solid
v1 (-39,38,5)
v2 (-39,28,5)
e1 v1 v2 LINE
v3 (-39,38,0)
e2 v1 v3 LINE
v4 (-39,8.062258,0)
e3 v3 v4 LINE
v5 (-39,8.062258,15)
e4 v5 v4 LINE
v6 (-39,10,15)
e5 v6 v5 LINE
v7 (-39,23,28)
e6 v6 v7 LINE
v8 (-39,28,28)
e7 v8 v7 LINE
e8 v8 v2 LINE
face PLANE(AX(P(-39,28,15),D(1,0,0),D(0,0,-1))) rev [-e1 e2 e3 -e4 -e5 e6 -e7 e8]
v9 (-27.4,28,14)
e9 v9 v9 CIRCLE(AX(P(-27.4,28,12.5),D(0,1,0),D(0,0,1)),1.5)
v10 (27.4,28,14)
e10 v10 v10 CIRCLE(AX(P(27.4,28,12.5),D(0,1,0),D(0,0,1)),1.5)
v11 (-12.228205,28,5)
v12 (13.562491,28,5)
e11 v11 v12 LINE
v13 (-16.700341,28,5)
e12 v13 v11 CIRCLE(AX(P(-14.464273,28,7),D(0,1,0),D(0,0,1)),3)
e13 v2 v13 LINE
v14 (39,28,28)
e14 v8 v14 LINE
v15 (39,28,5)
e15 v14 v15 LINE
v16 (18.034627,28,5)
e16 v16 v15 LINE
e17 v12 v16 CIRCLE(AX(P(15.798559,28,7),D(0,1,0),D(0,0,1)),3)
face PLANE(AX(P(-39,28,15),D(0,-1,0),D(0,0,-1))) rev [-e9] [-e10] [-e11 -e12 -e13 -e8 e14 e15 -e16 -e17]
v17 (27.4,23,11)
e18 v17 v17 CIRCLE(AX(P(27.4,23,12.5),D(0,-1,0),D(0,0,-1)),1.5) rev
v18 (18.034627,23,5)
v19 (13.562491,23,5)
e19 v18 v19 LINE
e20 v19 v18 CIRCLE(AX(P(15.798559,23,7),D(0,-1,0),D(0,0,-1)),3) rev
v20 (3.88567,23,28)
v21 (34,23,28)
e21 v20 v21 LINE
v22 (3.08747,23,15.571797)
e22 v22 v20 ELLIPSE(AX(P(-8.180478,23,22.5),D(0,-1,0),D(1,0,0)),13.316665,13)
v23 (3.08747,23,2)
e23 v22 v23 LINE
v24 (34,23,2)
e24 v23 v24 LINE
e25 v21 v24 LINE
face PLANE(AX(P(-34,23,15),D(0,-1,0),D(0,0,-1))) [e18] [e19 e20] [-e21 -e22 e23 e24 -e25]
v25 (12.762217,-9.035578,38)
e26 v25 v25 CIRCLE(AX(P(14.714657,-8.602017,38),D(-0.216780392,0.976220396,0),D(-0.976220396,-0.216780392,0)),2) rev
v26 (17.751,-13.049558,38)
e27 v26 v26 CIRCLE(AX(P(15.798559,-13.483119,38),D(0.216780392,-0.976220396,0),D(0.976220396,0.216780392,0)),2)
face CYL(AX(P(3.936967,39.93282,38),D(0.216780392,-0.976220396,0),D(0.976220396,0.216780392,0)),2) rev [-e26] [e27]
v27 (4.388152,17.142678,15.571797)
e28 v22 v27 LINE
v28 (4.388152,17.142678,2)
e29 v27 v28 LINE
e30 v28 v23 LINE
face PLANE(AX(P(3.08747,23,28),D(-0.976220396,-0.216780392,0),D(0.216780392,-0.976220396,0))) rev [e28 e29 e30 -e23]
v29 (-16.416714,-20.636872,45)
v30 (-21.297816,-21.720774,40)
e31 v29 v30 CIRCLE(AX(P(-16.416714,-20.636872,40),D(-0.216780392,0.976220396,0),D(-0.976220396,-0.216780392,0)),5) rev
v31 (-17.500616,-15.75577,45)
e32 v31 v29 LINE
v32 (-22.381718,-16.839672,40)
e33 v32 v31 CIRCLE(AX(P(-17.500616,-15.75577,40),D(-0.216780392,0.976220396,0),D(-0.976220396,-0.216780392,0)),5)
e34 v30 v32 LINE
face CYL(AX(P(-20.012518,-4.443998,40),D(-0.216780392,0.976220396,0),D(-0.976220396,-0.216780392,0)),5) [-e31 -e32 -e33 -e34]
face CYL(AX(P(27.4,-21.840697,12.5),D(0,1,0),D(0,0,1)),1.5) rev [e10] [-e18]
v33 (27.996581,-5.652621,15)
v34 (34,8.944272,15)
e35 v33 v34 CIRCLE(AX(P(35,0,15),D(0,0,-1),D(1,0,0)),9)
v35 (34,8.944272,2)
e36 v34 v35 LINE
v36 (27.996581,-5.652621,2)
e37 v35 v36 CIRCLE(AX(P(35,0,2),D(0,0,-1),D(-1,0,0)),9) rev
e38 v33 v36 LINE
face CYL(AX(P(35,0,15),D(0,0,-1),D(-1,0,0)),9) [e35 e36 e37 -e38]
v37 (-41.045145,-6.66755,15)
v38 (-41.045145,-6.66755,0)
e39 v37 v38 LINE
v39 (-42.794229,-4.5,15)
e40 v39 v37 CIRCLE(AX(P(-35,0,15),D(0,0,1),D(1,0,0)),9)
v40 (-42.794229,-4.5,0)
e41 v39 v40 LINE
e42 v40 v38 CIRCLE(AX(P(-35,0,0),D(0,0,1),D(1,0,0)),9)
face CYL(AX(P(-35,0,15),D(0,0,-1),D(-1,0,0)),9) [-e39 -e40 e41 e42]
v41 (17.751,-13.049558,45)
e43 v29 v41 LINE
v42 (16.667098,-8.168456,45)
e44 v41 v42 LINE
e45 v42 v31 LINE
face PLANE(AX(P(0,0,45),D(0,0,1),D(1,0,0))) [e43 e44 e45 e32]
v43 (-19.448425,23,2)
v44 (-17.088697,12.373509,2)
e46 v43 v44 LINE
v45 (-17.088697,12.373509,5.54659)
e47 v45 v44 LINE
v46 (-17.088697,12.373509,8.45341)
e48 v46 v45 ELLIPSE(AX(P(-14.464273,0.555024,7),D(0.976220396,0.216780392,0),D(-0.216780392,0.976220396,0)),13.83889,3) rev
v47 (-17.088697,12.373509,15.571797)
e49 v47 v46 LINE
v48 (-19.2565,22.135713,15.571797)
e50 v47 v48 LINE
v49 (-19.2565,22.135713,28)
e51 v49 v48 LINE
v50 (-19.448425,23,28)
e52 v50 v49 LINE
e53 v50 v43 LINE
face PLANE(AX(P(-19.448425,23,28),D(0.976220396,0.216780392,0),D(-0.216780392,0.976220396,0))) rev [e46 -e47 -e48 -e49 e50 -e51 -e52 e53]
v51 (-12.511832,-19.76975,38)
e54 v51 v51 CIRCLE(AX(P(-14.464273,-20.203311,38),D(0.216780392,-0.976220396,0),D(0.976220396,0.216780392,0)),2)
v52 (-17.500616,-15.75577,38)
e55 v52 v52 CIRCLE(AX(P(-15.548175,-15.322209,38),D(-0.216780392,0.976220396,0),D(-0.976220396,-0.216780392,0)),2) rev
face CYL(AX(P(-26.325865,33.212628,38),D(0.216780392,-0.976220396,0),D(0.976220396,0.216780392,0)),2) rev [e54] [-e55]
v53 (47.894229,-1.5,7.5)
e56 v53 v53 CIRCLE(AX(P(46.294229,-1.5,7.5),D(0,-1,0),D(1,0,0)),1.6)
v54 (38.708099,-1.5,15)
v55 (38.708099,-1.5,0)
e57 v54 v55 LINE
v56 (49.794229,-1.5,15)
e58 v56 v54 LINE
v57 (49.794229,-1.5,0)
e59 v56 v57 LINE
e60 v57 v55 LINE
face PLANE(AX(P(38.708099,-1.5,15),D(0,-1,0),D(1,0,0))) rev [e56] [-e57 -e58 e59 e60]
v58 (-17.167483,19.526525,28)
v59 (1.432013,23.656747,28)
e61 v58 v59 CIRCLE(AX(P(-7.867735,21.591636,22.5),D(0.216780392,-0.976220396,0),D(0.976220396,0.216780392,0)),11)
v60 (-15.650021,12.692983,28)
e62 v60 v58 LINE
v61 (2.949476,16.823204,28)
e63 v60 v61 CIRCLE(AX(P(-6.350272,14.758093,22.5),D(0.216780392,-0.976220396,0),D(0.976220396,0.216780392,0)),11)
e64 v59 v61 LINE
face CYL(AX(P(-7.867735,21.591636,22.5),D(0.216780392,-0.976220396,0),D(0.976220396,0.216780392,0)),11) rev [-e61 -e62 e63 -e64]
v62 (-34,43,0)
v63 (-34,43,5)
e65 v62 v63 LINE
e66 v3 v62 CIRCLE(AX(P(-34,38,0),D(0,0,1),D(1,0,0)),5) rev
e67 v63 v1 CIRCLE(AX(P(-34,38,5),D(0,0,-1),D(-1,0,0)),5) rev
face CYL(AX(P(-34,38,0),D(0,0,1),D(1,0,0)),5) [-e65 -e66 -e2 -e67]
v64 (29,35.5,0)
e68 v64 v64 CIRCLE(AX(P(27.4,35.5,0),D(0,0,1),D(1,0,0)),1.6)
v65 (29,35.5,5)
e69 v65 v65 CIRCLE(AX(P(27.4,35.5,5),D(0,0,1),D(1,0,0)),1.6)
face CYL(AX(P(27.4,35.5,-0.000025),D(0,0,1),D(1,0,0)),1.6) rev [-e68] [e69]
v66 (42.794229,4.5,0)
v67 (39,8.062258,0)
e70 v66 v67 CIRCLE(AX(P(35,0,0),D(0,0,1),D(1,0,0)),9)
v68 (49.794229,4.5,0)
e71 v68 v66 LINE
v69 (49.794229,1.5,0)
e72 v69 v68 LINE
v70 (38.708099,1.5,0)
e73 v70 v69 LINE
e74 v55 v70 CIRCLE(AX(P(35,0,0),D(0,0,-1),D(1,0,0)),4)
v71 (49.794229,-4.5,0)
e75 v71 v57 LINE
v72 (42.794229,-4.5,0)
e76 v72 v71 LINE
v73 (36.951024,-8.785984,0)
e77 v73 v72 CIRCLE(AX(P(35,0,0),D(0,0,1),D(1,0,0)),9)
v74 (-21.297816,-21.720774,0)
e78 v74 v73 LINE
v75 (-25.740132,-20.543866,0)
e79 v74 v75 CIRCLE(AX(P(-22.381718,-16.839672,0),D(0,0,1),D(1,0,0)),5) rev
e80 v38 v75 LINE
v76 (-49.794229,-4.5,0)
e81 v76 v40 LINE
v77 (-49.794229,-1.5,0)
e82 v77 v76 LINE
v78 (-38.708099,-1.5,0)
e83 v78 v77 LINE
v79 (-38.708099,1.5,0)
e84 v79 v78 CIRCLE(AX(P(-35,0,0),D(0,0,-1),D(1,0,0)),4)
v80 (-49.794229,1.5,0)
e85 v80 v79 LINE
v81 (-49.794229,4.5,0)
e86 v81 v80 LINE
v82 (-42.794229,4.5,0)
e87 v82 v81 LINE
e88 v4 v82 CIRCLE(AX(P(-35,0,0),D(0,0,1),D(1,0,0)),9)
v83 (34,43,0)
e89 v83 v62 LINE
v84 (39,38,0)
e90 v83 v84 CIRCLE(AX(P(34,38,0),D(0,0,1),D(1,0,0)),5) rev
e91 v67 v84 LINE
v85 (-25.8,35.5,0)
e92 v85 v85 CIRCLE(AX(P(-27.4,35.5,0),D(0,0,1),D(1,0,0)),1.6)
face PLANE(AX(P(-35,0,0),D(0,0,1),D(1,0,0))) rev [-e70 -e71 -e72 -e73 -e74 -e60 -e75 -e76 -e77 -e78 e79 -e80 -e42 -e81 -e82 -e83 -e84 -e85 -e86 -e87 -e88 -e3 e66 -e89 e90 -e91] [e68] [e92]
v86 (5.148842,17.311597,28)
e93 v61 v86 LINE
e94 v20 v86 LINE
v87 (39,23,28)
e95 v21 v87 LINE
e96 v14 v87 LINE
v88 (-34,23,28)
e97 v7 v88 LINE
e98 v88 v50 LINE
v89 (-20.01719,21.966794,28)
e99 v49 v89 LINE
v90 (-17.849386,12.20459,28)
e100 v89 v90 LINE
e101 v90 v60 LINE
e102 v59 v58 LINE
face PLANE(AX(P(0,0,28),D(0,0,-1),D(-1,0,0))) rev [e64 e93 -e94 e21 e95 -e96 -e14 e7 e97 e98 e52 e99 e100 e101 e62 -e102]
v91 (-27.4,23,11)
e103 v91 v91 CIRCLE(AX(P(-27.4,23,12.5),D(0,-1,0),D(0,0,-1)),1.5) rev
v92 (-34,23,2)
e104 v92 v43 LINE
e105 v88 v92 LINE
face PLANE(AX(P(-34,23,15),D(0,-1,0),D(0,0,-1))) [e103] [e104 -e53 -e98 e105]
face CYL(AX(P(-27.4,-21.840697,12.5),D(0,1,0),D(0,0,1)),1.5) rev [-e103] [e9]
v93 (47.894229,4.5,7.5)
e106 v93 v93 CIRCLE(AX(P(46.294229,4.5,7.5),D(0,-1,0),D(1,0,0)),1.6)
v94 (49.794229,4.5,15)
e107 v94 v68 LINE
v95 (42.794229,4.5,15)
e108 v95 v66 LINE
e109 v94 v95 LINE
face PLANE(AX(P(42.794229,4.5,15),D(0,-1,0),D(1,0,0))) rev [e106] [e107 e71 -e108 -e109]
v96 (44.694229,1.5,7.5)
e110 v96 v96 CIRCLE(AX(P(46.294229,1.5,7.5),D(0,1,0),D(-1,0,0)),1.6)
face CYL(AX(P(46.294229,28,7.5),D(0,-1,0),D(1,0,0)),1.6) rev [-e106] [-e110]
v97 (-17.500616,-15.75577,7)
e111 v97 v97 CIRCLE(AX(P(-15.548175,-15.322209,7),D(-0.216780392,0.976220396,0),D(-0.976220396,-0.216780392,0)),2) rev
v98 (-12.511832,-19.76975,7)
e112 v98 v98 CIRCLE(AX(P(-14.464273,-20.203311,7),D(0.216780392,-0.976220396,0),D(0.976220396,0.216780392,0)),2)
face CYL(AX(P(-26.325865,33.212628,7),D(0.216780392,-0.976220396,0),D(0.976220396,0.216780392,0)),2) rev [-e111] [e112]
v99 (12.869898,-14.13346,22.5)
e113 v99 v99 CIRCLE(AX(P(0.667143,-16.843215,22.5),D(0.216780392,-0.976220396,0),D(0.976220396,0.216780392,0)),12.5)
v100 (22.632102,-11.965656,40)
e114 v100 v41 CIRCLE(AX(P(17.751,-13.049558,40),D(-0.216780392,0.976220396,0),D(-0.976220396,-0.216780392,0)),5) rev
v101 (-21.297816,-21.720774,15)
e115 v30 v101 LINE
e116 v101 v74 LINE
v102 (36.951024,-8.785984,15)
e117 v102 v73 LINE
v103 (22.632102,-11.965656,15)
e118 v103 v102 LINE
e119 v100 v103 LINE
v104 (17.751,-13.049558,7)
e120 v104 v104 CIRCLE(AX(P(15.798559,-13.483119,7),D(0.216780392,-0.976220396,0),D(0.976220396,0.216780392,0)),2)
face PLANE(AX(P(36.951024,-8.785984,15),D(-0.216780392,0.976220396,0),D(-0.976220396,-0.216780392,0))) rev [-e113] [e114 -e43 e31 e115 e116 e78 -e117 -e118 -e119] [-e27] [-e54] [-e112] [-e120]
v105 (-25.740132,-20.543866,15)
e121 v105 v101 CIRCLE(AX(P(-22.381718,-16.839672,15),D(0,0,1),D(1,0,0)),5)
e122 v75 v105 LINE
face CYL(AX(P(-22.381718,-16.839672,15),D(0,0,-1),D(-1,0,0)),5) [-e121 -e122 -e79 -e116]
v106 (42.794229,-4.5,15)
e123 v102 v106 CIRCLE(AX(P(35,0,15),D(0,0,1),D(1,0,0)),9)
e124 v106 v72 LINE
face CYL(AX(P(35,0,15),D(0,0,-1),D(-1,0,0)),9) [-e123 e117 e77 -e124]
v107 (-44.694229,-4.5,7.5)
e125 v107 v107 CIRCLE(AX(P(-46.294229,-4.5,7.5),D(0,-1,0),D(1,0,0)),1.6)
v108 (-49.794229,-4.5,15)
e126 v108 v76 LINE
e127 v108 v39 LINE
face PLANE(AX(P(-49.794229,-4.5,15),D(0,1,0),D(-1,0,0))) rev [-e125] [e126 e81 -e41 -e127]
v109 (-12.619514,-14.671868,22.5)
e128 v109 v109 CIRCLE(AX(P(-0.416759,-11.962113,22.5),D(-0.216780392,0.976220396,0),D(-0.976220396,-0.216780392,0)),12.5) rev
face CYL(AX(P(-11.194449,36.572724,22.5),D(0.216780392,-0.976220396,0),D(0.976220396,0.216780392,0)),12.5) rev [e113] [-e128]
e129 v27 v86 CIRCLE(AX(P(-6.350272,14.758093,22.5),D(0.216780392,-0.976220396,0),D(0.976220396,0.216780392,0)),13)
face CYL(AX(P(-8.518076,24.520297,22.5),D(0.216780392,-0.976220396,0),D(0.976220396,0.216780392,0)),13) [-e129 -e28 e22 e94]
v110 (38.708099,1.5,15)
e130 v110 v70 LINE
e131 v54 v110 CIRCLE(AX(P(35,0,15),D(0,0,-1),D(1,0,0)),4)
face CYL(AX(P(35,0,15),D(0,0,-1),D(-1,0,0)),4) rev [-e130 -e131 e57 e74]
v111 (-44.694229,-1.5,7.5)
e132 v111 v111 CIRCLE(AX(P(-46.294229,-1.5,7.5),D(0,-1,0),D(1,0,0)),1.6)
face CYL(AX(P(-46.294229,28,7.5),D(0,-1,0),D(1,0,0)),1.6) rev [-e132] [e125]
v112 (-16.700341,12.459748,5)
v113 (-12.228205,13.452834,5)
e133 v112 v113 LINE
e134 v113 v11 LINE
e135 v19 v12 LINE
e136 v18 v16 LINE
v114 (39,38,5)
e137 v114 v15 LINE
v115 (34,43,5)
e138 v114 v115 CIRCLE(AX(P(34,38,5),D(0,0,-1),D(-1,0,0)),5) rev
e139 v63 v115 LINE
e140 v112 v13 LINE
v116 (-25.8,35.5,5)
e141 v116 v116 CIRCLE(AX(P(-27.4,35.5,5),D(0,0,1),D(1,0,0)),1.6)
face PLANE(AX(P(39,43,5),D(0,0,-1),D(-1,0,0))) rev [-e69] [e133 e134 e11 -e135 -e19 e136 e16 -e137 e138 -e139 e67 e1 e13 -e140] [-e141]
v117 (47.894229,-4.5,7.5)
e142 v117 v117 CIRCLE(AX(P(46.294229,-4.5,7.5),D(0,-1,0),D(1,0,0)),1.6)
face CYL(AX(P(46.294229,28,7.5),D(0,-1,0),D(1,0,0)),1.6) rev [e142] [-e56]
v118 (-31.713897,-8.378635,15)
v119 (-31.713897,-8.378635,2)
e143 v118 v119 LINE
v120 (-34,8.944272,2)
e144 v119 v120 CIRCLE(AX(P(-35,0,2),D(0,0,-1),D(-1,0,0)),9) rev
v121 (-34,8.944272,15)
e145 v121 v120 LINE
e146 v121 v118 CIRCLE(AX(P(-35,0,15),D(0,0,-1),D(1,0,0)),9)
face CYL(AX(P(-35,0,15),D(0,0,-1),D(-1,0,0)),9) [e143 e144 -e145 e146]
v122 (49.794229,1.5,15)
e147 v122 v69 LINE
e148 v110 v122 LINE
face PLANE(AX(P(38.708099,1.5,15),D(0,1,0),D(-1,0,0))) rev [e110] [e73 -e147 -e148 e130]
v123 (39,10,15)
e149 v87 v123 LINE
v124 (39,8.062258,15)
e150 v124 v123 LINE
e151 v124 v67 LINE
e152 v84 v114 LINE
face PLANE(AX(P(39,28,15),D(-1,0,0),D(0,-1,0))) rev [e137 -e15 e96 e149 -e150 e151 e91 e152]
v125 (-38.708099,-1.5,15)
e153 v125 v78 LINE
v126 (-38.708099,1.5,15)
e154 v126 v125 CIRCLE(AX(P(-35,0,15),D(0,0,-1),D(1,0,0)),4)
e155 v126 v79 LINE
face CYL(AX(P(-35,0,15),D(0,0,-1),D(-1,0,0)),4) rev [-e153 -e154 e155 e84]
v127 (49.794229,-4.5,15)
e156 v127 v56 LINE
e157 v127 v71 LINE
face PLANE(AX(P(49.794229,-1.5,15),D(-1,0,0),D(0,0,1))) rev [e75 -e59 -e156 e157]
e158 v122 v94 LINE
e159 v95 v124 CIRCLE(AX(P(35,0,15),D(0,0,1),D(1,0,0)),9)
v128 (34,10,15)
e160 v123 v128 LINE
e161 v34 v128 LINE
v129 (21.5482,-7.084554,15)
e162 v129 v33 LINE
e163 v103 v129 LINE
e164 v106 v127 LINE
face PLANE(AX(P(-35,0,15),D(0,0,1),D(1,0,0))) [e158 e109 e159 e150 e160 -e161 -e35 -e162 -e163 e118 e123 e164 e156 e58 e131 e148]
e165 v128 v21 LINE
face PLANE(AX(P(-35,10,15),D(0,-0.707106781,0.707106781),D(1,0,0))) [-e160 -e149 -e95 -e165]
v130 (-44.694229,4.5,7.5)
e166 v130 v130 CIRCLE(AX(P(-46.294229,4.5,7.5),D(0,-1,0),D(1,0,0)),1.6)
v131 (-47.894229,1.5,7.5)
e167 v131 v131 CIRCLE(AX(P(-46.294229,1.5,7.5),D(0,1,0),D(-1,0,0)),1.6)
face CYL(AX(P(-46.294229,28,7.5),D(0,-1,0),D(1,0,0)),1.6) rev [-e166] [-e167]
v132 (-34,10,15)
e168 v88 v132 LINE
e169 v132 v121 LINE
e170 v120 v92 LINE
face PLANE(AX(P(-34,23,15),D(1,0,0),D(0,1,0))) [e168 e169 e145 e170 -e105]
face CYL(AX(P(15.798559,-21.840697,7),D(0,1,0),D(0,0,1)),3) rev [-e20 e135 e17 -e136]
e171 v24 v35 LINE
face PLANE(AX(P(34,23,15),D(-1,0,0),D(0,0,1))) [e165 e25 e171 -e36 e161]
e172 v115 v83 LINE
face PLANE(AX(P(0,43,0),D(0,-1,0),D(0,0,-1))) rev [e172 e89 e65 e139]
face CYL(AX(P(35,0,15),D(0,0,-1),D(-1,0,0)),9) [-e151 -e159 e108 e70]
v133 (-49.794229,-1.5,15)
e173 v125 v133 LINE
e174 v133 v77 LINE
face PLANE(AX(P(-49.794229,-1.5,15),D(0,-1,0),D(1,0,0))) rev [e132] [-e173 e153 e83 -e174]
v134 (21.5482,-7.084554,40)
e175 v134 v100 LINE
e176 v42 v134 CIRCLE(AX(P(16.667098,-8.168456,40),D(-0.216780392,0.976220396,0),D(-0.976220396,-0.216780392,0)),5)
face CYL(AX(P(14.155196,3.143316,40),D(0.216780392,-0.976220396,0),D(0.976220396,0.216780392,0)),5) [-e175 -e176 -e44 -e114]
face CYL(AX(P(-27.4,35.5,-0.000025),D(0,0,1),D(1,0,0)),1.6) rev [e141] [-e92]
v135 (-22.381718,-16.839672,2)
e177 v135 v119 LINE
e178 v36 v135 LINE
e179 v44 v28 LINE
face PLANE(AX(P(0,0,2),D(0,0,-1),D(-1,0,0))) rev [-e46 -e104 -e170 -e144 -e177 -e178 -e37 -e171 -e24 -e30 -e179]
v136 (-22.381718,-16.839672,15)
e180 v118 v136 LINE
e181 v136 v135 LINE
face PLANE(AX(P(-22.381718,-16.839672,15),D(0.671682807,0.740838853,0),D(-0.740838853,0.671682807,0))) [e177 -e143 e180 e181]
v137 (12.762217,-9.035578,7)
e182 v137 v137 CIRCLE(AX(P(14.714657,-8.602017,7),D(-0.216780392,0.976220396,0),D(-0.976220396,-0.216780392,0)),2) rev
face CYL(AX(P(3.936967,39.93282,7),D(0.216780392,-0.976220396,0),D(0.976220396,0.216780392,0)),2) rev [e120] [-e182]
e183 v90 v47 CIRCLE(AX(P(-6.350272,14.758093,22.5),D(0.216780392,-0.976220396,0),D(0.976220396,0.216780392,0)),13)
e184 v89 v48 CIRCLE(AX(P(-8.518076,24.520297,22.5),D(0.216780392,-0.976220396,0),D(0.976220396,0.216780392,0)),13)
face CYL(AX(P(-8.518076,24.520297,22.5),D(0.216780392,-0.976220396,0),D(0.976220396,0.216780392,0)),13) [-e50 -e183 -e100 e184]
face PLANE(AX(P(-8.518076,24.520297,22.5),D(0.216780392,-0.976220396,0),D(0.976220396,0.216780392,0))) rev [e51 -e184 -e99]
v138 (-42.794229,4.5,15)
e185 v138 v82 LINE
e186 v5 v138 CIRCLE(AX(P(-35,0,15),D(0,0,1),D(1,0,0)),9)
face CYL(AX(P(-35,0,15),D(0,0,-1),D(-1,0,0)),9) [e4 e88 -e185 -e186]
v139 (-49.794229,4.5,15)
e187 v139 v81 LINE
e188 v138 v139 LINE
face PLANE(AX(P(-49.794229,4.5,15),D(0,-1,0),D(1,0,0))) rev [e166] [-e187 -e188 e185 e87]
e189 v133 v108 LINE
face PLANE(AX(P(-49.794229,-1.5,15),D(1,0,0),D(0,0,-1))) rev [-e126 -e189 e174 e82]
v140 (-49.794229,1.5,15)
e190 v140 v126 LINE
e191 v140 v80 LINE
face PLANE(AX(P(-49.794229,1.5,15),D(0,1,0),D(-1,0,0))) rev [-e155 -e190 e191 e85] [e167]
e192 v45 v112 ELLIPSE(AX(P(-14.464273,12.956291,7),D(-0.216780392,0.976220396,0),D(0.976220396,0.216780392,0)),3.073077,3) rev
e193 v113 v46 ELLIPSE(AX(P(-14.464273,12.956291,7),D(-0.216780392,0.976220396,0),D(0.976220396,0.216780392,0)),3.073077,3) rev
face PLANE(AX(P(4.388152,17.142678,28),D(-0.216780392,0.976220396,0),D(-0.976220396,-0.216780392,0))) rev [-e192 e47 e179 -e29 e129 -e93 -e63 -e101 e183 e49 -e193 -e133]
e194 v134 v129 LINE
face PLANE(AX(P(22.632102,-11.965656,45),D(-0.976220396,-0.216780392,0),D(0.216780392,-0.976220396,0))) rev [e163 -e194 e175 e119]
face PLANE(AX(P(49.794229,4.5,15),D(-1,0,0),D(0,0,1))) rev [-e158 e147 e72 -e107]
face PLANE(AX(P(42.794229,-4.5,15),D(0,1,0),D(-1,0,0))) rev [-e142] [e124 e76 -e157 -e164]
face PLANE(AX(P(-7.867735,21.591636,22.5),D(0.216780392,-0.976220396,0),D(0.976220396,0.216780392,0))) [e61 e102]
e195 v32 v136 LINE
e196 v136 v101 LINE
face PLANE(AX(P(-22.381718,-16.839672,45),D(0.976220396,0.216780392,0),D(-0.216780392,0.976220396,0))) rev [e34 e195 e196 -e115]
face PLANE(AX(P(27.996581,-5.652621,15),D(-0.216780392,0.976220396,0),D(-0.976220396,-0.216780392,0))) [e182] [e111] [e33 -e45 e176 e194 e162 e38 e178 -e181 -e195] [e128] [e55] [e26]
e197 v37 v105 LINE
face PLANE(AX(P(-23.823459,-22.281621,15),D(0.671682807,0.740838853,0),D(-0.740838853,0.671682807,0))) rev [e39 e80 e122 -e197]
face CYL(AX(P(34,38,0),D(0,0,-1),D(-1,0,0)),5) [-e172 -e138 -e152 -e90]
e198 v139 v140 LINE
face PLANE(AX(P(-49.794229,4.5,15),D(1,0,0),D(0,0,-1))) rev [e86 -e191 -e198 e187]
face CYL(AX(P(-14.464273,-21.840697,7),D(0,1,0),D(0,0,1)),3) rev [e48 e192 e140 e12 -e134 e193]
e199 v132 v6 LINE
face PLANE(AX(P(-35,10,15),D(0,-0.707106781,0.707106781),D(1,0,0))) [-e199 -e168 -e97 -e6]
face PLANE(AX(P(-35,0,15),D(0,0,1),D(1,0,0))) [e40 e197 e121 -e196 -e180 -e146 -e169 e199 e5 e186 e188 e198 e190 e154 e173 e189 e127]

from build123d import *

# Parameters (mm, degrees)
BOSS_EXTRUDE1_DEPTH = 15
SKETCH2_R           = 1.6
CUT_EXTRUDE1_DEPTH  = 62.324670446
BOSS_EXTRUDE2_DEPTH = 30
FILLET1_R           = 5
CUT_EXTRUDE2_REACH  = 84.635
SKETCH4_R           = 12.5
SKETCH4_R_2         = 2
BOSS_EXTRUDE3_DEPTH = 2
BOSS_EXTRUDE4_DEPTH = 26
SKETCH7_W           = 78
SKETCH7_H           = 13
BOSS_EXTRUDE5_DEPTH = 5
BOSS_EXTRUDE6_DEPTH = 10
SKETCH9_R           = 11
CUT_EXTRUDE4_DEPTH  = 7
CHAMFER1_SIZE       = 13
SKETCH10_W          = 78
SKETCH10_H          = 5
BOSS_EXTRUDE7_DEPTH = 15
SKETCH11_R          = 1.6
CUT_EXTRUDE5_DEPTH  = 77.996527229
CUT_EXTRUDE6_REACH  = 85.597
SKETCH12_R          = 1.5
FILLET2_R           = 5
CUT_EXTRUDE7_REACH  = 85.597


with BuildPart() as part:
    # Sketch1 → Boss-Extrude1 (new body)
    with BuildSketch(Plane.XY):
        with BuildLine():
            Line((-39, 28), (39, 28))
            Line((39, 28), (39, 8.062257748))
            ThreePointArc((39, 8.062257748), (41.160225429, 6.561373535), (42.794228634, 4.5))
            Line((42.794228634, 4.5), (49.794228634, 4.5))
            Line((49.794228634, 4.5), (49.794228634, 1.5))
            Line((49.794228634, 1.5), (38.708099244, 1.5))
            ThreePointArc((38.708099244, 1.5), (31, 0), (38.708099244, -1.5))
            Line((38.708099244, -1.5), (49.794228634, -1.5))
            Line((49.794228634, -1.5), (49.794228634, -4.5))
            Line((49.794228634, -4.5), (42.794228634, -4.5))
            ThreePointArc((42.794228634, -4.5), (40.323053514, -7.257072501), (36.951023531, -8.785983564))
            Line((36.951023531, -8.785983564), (-23.82345919, -22.281620679))
            Line((-23.82345919, -22.281620679), (-41.045145267, -6.667549678))
            ThreePointArc((-41.045145267, -6.667549678), (-42.004044217, -5.651846124), (-42.794228634, -4.5))
            Line((-42.794228634, -4.5), (-49.794228634, -4.5))
            Line((-49.794228634, -4.5), (-49.794228634, -1.5))
            Line((-49.794228634, -1.5), (-38.708099244, -1.5))
            ThreePointArc((-38.708099244, -1.5), (-31, 0), (-38.708099244, 1.5))
            Line((-38.708099244, 1.5), (-49.794228634, 1.5))
            Line((-49.794228634, 1.5), (-49.794228634, 4.5))
            Line((-49.794228634, 4.5), (-42.794228634, 4.5))
            ThreePointArc((-42.794228634, 4.5), (-41.160225429, 6.561373535), (-39, 8.062257748))
            Line((-39, 8.062257748), (-39, 28))
        make_face()
        with BuildLine():
            Line((-34, 23), (34, 23))
            Line((34, 23), (34, 8.94427191))
            ThreePointArc((34, 8.94427191), (26.676479172, 3.423302649), (27.996581118, -5.652620982))
            Line((27.996581118, -5.652620982), (-22.38171768, -16.839672004))
            Line((-22.38171768, -16.839672004), (-31.713897446, -8.378635331))
            ThreePointArc((-31.713897446, -8.378635331), (-26.077363193, 1.177519599), (-34, 8.94427191))
            Line((-34, 8.94427191), (-34, 23))
        make_face(mode=Mode.SUBTRACT)
    extrude(amount=BOSS_EXTRUDE1_DEPTH)

    # Sketch2 → Cut-Extrude1 (cut, through all)
    with BuildSketch(Plane.XZ.offset(4.5)):
        with Locations((-46.294228634, 7.5)):
            Circle(SKETCH2_R)
        with Locations((46.294228634, 7.5)):
            Circle(SKETCH2_R)
    extrude(amount=-CUT_EXTRUDE1_DEPTH, mode=Mode.SUBTRACT)

    # Sketch3 → Boss-Extrude2 (add)
    with BuildSketch(Plane.XY.offset(15)):
        Polygon((-22.38171768, -16.839672004), (-21.297815718, -21.720773984), (22.6321021, -11.965656329), (21.548200138, -7.084554349), align=None)
    extrude(amount=BOSS_EXTRUDE2_DEPTH)

    # Fillet1
    fillet1_edges = [part.edges().sort_by_distance(p)[0] for p in [
        (-23.82345919, -22.281620679, 7.5),
        (22.090151119, -9.525105339, 45),
        (-21.839766699, -19.280222994, 45),
    ]]
    fillet(fillet1_edges, radius=FILLET1_R)

    # Sketch4 → Cut-Extrude2 (cut, up to next)
    with BuildSketch(Plane(origin=(3.595804379, -16.192873979, 0), x_dir=(0.9762203959642155, 0.21678039234089044, 0), z_dir=(0.21678039234089044, -0.9762203959642155, 0)), mode=Mode.PRIVATE) as cut_extrude2_sk1:
        with Locations((-3, 22.5)):
            Circle(SKETCH4_R)
    cut_extrude2_tool1 = extrude(cut_extrude2_sk1.sketch, amount=-CUT_EXTRUDE2_REACH, mode=Mode.PRIVATE) & part.part
    # Sketch4 → Cut-Extrude2 (cut, up to next)
    with BuildSketch(Plane(origin=(3.595804379, -16.192873979, 0), x_dir=(0.9762203959642155, 0.21678039234089044, 0), z_dir=(0.21678039234089044, -0.9762203959642155, 0)), mode=Mode.PRIVATE) as cut_extrude2_sk2:
        with Locations((-18.5, 38)):
            Circle(SKETCH4_R_2)
    cut_extrude2_tool2 = extrude(cut_extrude2_sk2.sketch, amount=-CUT_EXTRUDE2_REACH, mode=Mode.PRIVATE) & part.part
    # Sketch4 → Cut-Extrude2 (cut, up to next)
    with BuildSketch(Plane(origin=(3.595804379, -16.192873979, 0), x_dir=(0.9762203959642155, 0.21678039234089044, 0), z_dir=(0.21678039234089044, -0.9762203959642155, 0)), mode=Mode.PRIVATE) as cut_extrude2_sk3:
        with Locations((12.5, 38)):
            Circle(SKETCH4_R_2)
    cut_extrude2_tool3 = extrude(cut_extrude2_sk3.sketch, amount=-CUT_EXTRUDE2_REACH, mode=Mode.PRIVATE) & part.part
    # Sketch4 → Cut-Extrude2 (cut, up to next)
    with BuildSketch(Plane(origin=(3.595804379, -16.192873979, 0), x_dir=(0.9762203959642155, 0.21678039234089044, 0), z_dir=(0.21678039234089044, -0.9762203959642155, 0)), mode=Mode.PRIVATE) as cut_extrude2_sk4:
        with Locations((12.5, 7)):
            Circle(SKETCH4_R_2)
    cut_extrude2_tool4 = extrude(cut_extrude2_sk4.sketch, amount=-CUT_EXTRUDE2_REACH, mode=Mode.PRIVATE) & part.part
    # Sketch4 → Cut-Extrude2 (cut, up to next)
    with BuildSketch(Plane(origin=(3.595804379, -16.192873979, 0), x_dir=(0.9762203959642155, 0.21678039234089044, 0), z_dir=(0.21678039234089044, -0.9762203959642155, 0)), mode=Mode.PRIVATE) as cut_extrude2_sk5:
        with Locations((-18.5, 7)):
            Circle(SKETCH4_R_2)
    cut_extrude2_tool5 = extrude(cut_extrude2_sk5.sketch, amount=-CUT_EXTRUDE2_REACH, mode=Mode.PRIVATE) & part.part
    add(cut_extrude2_tool1.solids().sort_by_distance((0.667143, -16.843215, 22.5))[0], mode=Mode.SUBTRACT)
    add(cut_extrude2_tool2.solids().sort_by_distance((-14.464273, -20.203311, 38))[0], mode=Mode.SUBTRACT)
    add(cut_extrude2_tool3.solids().sort_by_distance((15.798559, -13.483119, 38))[0], mode=Mode.SUBTRACT)
    add(cut_extrude2_tool4.solids().sort_by_distance((15.798559, -13.483119, 7))[0], mode=Mode.SUBTRACT)
    add(cut_extrude2_tool5.solids().sort_by_distance((-14.464273, -20.203311, 7))[0], mode=Mode.SUBTRACT)

    # Sketch5 → Boss-Extrude3 (add)
    with BuildSketch(Plane(origin=(0, 0, 0), x_dir=(-1, 0, 0), z_dir=(0, 0, -1))):
        Polygon((-34, 23), (-34, 8.94427191), (-27.996581118, -5.652620982), (22.38171768, -16.839672004), (31.713897446, -8.378635331), (29.251891486, 2.846497001), (34, 8.94427191), (34, 23), align=None)
    extrude(amount=-BOSS_EXTRUDE3_DEPTH)

    # Sketch6 → Boss-Extrude4 (add)
    with BuildSketch(Plane.XY.offset(2)):
        Polygon((3.087469785, 23), (4.388152139, 17.142677624), (-17.088696572, 12.373508993), (-19.448424866, 23), align=None)
    extrude(amount=BOSS_EXTRUDE4_DEPTH)

    # Sketch7 → Boss-Extrude5 (add)
    with BuildSketch(Plane(origin=(0, 23, 0), x_dir=(1, 0, 0), z_dir=(0, 1, 0))):
        with Locations((0, -21.5)):
            Rectangle(SKETCH7_W, SKETCH7_H)
    extrude(amount=BOSS_EXTRUDE5_DEPTH)

    # Sketch8 → Boss-Extrude6 (add)
    with BuildSketch(Plane(origin=(-3.421611029, 15.408434485, 0), x_dir=(0.9762203959642155, 0.21678039234089055, 0), z_dir=(0.21678039234089053, -0.9762203959642154, 0))):
        with BuildLine():
            Line((-14.779218989, 28), (-12.526279442, 28))
            ThreePointArc((-12.526279442, 28), (-3, 11.5), (6.526279442, 28))
            Line((6.526279442, 28), (8.779218989, 28))
            ThreePointArc((8.779218989, 28), (-3, 9.5), (-14.779218989, 28))
        make_face()
    extrude(amount=-BOSS_EXTRUDE6_DEPTH)

    # Sketch9 → Cut-Extrude4 (cut)
    with BuildSketch(Plane(origin=(-3.421611029, 15.408434485, 0), x_dir=(0.9762203959642155, 0.21678039234089055, 0), z_dir=(0.21678039234089053, -0.9762203959642154, 0))):
        with Locations((-3, 22.5)):
            Circle(SKETCH9_R)
    extrude(amount=-CUT_EXTRUDE4_DEPTH, mode=Mode.SUBTRACT)

    # Chamfer1
    chamfer1_edges = [part.edges().sort_by_distance(p)[0] for p in [
        (-36.5, 23, 15),
        (36.5, 23, 15),
    ]]
    chamfer(chamfer1_edges, length=CHAMFER1_SIZE - 0.0001)  # a hair under: the kernel refuses the full size

    # Sketch10 → Boss-Extrude7 (add)
    with BuildSketch(Plane(origin=(0, 28, 0), x_dir=(1, 0, 0), z_dir=(0, 1, 0))):
        with Locations((0, -2.5)):
            Rectangle(SKETCH10_W, SKETCH10_H)
    extrude(amount=BOSS_EXTRUDE7_DEPTH)

    # Sketch11 → Cut-Extrude5 (cut, through all)
    with BuildSketch(Plane.XY.offset(5)):
        with Locations((-27.4, 35.5)):
            Circle(SKETCH11_R)
        with Locations((27.4, 35.5)):
            Circle(SKETCH11_R)
    extrude(amount=-CUT_EXTRUDE5_DEPTH, mode=Mode.SUBTRACT)

    # Sketch12 → Cut-Extrude6 (cut, up to next)
    with BuildSketch(Plane(origin=(0, 28, 0), x_dir=(1, 0, 0), z_dir=(0, 1, 0)), mode=Mode.PRIVATE) as cut_extrude6_sk1:
        with Locations(Location((27.4, -12.5, 0), (0, 0, 270))):
            Circle(SKETCH12_R)
    cut_extrude6_tool1 = extrude(cut_extrude6_sk1.sketch, amount=-CUT_EXTRUDE6_REACH, mode=Mode.PRIVATE) & part.part
    # Sketch12 → Cut-Extrude6 (cut, up to next)
    with BuildSketch(Plane(origin=(0, 28, 0), x_dir=(1, 0, 0), z_dir=(0, 1, 0)), mode=Mode.PRIVATE) as cut_extrude6_sk2:
        with Locations(Location((-27.4, -12.5, 0), (0, 0, 270))):
            Circle(SKETCH12_R)
    cut_extrude6_tool2 = extrude(cut_extrude6_sk2.sketch, amount=-CUT_EXTRUDE6_REACH, mode=Mode.PRIVATE) & part.part
    add(cut_extrude6_tool1.solids().sort_by_distance((27.4, 28, 12.5))[0], mode=Mode.SUBTRACT)
    add(cut_extrude6_tool2.solids().sort_by_distance((-27.4, 28, 12.5))[0], mode=Mode.SUBTRACT)

    # Fillet2
    fillet2_edges = [part.edges().sort_by_distance(p)[0] for p in [
        (-39, 43, 2.5),
        (39, 43, 2.5),
    ]]
    fillet(fillet2_edges, radius=FILLET2_R)

    # Sketch14 → Cut-Extrude7 (cut, up to next)
    with BuildSketch(Plane(origin=(0, 28, 0), x_dir=(1, 0, 0), z_dir=(0, 1, 0)), mode=Mode.PRIVATE) as cut_extrude7_sk1:
        with BuildLine():
            Line((18.034627306, -5), (13.562491351, -5))
            ThreePointArc((13.562491351, -5), (15.798559328, -10), (18.034627306, -5))
        make_face()
    cut_extrude7_tool1 = extrude(cut_extrude7_sk1.sketch, amount=-CUT_EXTRUDE7_REACH, mode=Mode.PRIVATE) & part.part
    # Sketch14 → Cut-Extrude7 (cut, up to next)
    with BuildSketch(Plane(origin=(0, 28, 0), x_dir=(1, 0, 0), z_dir=(0, 1, 0)), mode=Mode.PRIVATE) as cut_extrude7_sk2:
        with BuildLine():
            Line((-12.228204969, -5), (-16.700340924, -5))
            ThreePointArc((-16.700340924, -5), (-14.464272947, -10), (-12.228204969, -5))
        make_face()
    cut_extrude7_tool2 = extrude(cut_extrude7_sk2.sketch, amount=-CUT_EXTRUDE7_REACH, mode=Mode.PRIVATE) & part.part
    add(cut_extrude7_tool1.solids().sort_by_distance((15.798559, 28, 7.296048))[0], mode=Mode.SUBTRACT)
    add(cut_extrude7_tool2.solids().sort_by_distance((-14.464273, 28, 7.296048))[0], mode=Mode.SUBTRACT)


solid = part.part
